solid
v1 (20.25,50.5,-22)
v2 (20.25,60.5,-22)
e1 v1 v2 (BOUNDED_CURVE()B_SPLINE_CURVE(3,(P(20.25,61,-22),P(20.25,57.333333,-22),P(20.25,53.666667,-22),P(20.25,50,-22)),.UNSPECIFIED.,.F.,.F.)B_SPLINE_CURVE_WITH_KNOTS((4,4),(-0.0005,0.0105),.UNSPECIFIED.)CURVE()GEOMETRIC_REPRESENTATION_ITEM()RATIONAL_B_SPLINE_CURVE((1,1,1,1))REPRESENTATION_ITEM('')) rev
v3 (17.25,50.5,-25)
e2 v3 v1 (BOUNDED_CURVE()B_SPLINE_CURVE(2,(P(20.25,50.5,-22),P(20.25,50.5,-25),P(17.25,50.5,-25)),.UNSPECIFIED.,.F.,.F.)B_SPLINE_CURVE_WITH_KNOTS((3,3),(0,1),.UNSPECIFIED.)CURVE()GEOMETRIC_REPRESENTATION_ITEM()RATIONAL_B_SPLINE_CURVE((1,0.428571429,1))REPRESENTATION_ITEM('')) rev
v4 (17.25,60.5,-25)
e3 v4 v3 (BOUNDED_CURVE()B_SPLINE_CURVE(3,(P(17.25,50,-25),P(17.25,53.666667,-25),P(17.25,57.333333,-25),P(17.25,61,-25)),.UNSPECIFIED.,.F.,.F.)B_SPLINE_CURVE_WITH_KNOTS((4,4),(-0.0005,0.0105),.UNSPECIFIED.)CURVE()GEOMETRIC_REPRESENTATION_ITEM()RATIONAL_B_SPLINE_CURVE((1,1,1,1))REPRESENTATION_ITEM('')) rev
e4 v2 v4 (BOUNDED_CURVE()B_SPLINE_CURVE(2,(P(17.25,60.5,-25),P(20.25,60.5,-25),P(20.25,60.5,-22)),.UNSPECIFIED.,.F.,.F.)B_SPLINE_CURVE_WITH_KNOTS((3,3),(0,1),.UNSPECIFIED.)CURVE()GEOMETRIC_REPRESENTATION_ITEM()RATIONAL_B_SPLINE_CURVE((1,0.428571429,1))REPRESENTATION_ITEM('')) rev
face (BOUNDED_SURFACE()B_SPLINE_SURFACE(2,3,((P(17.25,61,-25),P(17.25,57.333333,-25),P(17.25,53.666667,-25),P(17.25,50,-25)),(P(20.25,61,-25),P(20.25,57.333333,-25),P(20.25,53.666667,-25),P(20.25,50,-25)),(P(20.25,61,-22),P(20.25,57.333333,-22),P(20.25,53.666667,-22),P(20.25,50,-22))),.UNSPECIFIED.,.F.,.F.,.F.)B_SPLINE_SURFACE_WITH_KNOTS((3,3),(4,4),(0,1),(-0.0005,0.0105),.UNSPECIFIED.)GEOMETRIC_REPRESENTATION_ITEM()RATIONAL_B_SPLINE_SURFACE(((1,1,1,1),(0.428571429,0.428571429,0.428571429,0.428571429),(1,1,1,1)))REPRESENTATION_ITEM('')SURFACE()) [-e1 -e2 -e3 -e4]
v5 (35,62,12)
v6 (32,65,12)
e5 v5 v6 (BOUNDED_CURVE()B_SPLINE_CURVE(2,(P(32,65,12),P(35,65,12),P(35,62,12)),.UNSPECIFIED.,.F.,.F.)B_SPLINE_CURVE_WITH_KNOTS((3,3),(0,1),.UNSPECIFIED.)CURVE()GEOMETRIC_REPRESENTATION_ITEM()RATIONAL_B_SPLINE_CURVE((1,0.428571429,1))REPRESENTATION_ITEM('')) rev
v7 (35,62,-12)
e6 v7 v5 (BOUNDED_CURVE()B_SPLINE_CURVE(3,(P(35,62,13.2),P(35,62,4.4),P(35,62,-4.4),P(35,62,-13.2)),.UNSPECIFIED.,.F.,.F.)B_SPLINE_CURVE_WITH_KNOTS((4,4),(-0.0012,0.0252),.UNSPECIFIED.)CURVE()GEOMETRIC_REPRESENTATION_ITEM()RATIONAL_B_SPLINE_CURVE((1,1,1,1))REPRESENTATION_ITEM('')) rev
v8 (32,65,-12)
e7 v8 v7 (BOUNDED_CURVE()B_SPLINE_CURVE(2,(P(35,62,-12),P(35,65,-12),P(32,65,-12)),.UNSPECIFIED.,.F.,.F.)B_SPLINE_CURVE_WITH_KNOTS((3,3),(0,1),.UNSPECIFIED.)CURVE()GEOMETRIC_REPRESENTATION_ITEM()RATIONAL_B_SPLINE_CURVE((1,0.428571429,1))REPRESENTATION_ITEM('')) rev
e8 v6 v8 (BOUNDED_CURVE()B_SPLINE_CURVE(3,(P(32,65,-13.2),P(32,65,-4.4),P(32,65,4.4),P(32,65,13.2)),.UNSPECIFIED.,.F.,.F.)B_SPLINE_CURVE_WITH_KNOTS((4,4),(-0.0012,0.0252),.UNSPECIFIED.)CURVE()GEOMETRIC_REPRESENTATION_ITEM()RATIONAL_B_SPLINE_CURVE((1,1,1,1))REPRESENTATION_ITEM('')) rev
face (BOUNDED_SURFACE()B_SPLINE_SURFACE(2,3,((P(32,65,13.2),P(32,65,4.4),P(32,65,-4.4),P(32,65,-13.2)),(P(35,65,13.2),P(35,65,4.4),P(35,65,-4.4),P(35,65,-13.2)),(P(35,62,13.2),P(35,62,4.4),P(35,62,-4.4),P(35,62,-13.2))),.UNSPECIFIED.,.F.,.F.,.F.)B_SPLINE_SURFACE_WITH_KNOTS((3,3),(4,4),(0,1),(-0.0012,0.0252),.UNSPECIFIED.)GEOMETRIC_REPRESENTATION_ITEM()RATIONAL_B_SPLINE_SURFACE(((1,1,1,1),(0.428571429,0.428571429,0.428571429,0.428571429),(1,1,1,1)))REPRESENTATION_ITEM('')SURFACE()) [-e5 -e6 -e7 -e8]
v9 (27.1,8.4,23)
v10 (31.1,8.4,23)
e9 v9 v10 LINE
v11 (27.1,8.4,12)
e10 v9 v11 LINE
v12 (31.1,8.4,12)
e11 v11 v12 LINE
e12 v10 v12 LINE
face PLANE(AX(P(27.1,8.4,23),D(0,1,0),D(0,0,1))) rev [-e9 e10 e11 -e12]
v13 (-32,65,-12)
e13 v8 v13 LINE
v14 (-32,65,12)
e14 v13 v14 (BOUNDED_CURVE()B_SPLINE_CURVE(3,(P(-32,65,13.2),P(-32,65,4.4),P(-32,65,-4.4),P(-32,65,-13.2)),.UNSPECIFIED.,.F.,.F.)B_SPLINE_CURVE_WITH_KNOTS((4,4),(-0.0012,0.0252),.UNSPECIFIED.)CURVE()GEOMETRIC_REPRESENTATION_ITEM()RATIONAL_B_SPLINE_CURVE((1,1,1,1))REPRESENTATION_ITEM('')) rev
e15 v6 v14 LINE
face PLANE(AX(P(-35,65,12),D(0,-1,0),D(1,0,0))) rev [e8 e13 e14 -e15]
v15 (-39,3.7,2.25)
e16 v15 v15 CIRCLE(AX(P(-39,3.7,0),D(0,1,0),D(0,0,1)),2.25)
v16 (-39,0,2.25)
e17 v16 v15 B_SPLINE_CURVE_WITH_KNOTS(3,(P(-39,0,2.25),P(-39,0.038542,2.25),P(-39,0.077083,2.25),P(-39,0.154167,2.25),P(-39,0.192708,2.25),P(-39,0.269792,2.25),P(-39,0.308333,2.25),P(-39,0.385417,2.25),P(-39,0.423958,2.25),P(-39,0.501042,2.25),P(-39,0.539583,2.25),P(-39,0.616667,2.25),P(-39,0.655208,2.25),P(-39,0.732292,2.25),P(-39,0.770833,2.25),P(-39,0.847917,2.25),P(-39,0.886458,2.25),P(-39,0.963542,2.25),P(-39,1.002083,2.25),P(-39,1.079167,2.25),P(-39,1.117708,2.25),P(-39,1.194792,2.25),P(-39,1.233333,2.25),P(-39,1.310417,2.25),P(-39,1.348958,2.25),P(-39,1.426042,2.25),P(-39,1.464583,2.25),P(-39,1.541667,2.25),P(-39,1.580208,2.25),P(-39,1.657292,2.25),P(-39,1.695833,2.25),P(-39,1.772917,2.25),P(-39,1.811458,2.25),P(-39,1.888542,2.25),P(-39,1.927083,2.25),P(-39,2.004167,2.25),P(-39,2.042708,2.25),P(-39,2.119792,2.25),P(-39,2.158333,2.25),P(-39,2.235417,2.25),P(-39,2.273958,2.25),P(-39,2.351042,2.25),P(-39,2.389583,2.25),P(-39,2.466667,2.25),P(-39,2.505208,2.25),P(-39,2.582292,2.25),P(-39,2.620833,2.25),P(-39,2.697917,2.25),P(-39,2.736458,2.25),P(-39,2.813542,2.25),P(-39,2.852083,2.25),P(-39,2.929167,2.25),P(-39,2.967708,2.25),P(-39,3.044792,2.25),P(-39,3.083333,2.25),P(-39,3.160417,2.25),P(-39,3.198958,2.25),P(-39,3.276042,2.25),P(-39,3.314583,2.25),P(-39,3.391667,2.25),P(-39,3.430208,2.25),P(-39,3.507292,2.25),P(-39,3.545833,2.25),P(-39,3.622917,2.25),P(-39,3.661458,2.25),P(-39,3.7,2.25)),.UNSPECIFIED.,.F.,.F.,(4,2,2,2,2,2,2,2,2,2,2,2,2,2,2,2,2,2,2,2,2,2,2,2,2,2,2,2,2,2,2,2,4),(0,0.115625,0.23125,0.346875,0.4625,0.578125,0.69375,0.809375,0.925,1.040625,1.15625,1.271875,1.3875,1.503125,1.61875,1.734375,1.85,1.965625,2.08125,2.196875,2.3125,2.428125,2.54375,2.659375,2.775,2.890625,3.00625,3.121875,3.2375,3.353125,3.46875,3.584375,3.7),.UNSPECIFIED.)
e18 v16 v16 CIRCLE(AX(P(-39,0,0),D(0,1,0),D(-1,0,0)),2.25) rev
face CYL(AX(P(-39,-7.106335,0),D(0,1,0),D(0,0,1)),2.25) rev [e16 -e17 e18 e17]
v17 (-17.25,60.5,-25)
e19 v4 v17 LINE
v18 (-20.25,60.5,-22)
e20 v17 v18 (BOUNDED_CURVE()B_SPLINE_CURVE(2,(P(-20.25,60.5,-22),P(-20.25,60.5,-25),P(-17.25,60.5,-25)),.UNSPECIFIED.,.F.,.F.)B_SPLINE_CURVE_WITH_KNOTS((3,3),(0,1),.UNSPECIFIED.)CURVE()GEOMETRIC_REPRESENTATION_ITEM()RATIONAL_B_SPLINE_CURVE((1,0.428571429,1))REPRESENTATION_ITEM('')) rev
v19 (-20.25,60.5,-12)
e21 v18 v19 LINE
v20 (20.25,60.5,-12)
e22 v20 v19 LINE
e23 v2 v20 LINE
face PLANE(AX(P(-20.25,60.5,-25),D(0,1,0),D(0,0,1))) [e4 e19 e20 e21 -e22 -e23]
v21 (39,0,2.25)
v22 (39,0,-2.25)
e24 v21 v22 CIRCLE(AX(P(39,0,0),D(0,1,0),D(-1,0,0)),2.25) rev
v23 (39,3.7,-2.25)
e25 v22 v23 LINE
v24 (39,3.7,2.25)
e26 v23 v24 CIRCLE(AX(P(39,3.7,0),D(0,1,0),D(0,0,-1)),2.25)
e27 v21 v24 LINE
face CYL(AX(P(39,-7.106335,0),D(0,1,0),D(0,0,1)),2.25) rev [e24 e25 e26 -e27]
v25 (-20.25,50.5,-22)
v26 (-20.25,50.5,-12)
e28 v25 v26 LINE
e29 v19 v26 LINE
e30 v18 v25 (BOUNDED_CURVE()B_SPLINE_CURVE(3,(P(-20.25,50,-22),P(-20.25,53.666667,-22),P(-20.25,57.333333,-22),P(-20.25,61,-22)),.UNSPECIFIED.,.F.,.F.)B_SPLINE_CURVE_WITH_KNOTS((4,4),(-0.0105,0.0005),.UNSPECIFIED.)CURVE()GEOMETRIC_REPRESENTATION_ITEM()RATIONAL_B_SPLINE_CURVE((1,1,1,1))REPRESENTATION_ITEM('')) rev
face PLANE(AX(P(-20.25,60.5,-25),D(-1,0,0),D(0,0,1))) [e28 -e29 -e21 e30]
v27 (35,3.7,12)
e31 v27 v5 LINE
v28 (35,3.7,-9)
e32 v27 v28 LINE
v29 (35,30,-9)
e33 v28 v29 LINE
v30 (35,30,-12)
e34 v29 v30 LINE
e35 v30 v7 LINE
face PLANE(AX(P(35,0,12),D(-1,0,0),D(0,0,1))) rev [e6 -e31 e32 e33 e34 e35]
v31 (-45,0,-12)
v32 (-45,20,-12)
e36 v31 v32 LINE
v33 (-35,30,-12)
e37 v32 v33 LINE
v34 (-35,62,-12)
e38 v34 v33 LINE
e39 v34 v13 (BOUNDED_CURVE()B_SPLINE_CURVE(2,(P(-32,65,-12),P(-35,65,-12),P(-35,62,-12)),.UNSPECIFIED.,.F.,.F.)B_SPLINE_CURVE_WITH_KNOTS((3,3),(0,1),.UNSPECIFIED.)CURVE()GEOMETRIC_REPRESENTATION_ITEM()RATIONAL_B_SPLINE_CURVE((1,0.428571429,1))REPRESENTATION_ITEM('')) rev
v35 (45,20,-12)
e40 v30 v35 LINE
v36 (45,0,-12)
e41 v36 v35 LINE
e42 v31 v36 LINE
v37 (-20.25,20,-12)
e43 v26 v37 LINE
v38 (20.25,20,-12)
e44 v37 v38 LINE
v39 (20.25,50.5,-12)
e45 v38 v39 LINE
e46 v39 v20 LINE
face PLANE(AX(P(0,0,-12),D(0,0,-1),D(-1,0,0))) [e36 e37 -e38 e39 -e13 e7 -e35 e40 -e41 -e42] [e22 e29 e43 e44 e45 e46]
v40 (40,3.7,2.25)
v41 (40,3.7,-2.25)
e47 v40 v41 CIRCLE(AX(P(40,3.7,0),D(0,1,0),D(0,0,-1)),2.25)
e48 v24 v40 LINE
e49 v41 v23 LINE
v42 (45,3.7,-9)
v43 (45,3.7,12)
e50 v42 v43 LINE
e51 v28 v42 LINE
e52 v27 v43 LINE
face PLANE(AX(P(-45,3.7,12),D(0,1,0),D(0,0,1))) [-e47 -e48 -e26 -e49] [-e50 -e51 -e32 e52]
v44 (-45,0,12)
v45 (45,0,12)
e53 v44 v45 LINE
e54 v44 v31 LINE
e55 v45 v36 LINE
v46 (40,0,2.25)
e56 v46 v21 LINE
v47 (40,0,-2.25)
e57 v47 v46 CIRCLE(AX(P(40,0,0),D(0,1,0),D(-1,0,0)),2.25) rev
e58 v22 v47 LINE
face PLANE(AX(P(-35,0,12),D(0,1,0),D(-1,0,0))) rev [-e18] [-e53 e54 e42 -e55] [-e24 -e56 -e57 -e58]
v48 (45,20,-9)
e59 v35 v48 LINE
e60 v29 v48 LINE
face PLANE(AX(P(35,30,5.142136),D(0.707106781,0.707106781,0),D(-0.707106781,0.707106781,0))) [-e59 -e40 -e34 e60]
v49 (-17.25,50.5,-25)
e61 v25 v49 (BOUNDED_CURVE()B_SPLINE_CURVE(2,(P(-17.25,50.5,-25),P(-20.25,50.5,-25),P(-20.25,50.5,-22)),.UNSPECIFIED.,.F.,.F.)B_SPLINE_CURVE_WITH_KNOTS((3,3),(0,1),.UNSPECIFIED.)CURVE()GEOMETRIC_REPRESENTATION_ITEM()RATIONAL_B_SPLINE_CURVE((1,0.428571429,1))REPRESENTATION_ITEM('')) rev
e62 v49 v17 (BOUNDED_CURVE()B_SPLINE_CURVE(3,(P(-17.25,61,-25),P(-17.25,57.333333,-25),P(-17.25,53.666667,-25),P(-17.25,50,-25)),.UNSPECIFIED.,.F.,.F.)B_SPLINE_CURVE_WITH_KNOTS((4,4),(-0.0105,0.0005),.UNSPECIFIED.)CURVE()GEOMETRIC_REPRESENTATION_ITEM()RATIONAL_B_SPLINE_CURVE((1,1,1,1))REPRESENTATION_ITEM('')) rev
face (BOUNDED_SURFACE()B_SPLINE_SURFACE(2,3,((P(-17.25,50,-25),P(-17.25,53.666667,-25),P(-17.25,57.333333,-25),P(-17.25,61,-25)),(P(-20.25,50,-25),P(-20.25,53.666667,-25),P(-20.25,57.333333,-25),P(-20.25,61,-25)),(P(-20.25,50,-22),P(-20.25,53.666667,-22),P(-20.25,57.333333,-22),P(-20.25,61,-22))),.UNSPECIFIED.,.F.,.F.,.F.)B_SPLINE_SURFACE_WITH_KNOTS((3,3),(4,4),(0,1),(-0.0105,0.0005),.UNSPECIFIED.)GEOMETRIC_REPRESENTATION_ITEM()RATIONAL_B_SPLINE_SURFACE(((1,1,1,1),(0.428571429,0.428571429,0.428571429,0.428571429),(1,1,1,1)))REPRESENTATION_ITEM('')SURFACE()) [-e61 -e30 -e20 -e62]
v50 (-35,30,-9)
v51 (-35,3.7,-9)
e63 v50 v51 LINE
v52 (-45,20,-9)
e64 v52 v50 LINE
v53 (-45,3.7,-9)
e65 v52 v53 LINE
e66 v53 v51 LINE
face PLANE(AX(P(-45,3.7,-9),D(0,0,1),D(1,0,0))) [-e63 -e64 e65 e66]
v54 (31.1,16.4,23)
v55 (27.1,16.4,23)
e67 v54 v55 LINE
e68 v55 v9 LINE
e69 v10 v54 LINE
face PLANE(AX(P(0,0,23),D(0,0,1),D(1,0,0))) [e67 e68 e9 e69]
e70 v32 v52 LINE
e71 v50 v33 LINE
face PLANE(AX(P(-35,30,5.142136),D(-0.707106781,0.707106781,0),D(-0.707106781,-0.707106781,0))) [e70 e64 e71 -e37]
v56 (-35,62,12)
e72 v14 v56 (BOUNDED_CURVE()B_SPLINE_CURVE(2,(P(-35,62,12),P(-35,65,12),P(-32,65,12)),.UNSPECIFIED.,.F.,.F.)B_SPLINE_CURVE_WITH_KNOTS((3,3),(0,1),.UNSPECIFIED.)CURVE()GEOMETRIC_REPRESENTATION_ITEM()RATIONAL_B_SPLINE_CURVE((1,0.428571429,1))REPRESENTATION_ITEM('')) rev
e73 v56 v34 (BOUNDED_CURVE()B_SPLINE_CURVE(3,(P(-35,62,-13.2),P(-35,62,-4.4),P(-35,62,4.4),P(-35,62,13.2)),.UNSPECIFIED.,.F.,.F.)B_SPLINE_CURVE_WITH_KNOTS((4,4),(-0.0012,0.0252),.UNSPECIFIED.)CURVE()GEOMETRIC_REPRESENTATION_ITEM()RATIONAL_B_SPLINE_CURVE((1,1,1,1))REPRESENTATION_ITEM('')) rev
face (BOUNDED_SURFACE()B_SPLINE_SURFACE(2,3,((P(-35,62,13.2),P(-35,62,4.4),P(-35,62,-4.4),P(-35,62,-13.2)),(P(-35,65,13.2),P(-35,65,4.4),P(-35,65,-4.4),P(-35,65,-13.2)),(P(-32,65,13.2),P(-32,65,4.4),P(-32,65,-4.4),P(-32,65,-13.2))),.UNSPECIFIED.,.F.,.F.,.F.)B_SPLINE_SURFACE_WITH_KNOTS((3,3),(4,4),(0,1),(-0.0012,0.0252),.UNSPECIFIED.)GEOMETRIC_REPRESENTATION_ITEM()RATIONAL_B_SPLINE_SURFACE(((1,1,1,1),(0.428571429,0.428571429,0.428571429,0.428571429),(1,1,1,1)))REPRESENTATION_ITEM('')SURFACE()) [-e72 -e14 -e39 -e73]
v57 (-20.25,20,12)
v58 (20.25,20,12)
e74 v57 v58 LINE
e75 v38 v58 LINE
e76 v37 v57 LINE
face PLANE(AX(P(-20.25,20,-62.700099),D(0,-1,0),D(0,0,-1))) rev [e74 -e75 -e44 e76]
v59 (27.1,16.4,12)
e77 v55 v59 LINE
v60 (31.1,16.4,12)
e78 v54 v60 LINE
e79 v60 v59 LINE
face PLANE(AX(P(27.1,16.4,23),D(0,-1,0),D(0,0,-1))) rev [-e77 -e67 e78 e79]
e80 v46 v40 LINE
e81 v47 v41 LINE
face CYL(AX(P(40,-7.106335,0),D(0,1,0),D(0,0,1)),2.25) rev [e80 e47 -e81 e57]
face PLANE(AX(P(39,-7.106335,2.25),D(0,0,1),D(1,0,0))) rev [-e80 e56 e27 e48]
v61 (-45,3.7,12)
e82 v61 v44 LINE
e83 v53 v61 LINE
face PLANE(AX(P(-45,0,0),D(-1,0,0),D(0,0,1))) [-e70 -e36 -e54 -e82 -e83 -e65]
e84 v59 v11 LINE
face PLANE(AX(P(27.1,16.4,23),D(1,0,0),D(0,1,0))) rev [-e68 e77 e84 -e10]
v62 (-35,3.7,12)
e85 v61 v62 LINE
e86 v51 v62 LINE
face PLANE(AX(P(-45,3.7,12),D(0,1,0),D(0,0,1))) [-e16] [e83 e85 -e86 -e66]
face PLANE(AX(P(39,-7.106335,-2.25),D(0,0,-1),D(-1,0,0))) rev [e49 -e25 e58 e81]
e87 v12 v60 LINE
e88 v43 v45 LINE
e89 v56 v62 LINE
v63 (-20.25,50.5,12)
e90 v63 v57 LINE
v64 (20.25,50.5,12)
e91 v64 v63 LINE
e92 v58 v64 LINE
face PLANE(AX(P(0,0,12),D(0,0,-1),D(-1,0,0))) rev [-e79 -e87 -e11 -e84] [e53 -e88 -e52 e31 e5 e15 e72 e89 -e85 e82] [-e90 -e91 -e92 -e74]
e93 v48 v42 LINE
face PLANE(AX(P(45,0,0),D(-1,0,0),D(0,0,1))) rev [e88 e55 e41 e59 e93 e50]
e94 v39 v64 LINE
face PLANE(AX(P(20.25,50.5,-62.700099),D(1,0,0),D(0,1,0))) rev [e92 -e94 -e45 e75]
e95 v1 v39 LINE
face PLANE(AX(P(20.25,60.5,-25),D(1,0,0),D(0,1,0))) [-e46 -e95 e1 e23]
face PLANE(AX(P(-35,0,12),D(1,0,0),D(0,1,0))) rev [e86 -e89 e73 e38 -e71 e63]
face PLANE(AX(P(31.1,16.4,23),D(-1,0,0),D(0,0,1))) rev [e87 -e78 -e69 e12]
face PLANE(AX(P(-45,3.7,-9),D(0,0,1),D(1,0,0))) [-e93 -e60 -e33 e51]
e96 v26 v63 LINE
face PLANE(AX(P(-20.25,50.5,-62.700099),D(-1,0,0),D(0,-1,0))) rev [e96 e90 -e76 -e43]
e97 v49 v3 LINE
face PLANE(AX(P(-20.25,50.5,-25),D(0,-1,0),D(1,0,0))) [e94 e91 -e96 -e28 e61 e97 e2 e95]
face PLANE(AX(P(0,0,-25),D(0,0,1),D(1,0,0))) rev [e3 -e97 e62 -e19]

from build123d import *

# Parameters (mm, degrees)
SKETCH1_W           = 70
SKETCH1_H           = 65
BOSS_EXTRUDE1_DEPTH = 12
BOSS_EXTRUDE2_START = 10
BOSS_EXTRUDE2_DEPTH = 90
BOSS_EXTRUDE3_DEPTH = 3
SKETCH4_W           = 40.5
SKETCH4_H           = 10
BOSS_EXTRUDE4_DEPTH = 13
SKETCH5_W           = 40.5
SKETCH5_H           = 30.5
CUT_EXTRUDE1_DEPTH  = 24
SKETCH6_W           = 4
SKETCH6_H           = 8
BOSS_EXTRUDE5_DEPTH = 11
FILLET1_SIZE        = 3
SKETCH7_R           = 2.25
CUT_EXTRUDE2_DEPTH  = 3.7


with BuildPart() as part:
    # Sketch1 → Boss-Extrude1 (new, symmetric)
    with BuildSketch(Plane.XY):
        with Locations((0, 32.5)):
            Rectangle(SKETCH1_W, SKETCH1_H)
    extrude(amount=BOSS_EXTRUDE1_DEPTH, both=True)

    # Sketch2 → Boss-Extrude2 (add)
    with BuildSketch(Plane(origin=(35, 0, 0), x_dir=(0, 0, -1), z_dir=(1, 0, 0)).offset(BOSS_EXTRUDE2_START)):
        Polygon((12, 20), (12, 0), (-12, 0), (-12, 3.7), (9, 3.7), (9, 20), align=None)
    extrude(amount=-BOSS_EXTRUDE2_DEPTH)

    # Sketch3 → Boss-Extrude3 (add)
    with BuildSketch(Plane(origin=(0, 0, -12), x_dir=(-1, 0, 0), z_dir=(0, 0, -1))):
        Polygon((-45, 20), (-35, 20), (-35, 30), align=None)
        Polygon((35, 30), (45, 20), (35, 20), align=None)
    extrude(amount=-BOSS_EXTRUDE3_DEPTH)

    # Sketch4 → Boss-Extrude4 (add)
    with BuildSketch(Plane.XY.offset(-12)):
        with Locations((0, 55.5)):
            Rectangle(SKETCH4_W, SKETCH4_H)
    extrude(amount=-BOSS_EXTRUDE4_DEPTH)

    # Sketch5 → Cut-Extrude1 (cut)
    with BuildSketch(Plane.XY.offset(12)):
        with Locations((0, 35.25)):
            Rectangle(SKETCH5_W, SKETCH5_H)
    extrude(amount=-CUT_EXTRUDE1_DEPTH, mode=Mode.SUBTRACT)

    # Sketch6 → Boss-Extrude5 (add)
    with BuildSketch(Plane.XY.offset(12)):
        with Locations((29.1, 12.4)):
            Rectangle(SKETCH6_W, SKETCH6_H)
    extrude(amount=BOSS_EXTRUDE5_DEPTH)

    # Fillet1
    # a fillet whose section is not a circle: 3 mm, written as the material it takes off along each edge
    with BuildSketch(Plane(origin=(-35, 65, 19.5), x_dir=(0, -1, 0), z_dir=(0, 0, -1)), Plane(origin=(35, 65, -19.5), x_dir=(0, -1, 0), z_dir=(0, 0, 1))) as fillet1_piece_1:
        with BuildLine():
            Bezier((FILLET1_SIZE, 0), (0, 0), (0, -FILLET1_SIZE), weights=[1, 0.428571429, 1])
            Line((0, -FILLET1_SIZE), (0, 0))
            Line((0, 0), (FILLET1_SIZE, 0))
        make_face()
    extrude(amount=39, mode=Mode.SUBTRACT)
    with BuildSketch(Plane(origin=(-20.25, 43, -25), x_dir=(0, 0, 1), z_dir=(0, 1, 0)), Plane(origin=(20.25, 68, -25), x_dir=(0, 0, 1), z_dir=(0, -1, 0))) as fillet1_piece_2:
        with BuildLine():
            Bezier((FILLET1_SIZE, 0), (0, 0), (0, FILLET1_SIZE), weights=[1, 0.428571429, 1])
            Line((0, FILLET1_SIZE), (0, 0))
            Line((0, 0), (FILLET1_SIZE, 0))
        make_face()
    extrude(amount=25, mode=Mode.SUBTRACT)

    # Sketch7 → Cut-Extrude2 (cut)
    with BuildSketch(Plane(origin=(0, 3.7, 0), x_dir=(1, 0, 0), z_dir=(0, 1, 0))):
        with Locations(Location((-39, 0, 0), (0, 0, 270))):
            Circle(SKETCH7_R)
        with BuildLine():
            Line((39, 2.25), (40, 2.25))
            ThreePointArc((40, 2.25), (42.25, 0), (40, -2.25))
            Line((40, -2.25), (39, -2.25))
            ThreePointArc((39, -2.25), (36.75, 0), (39, 2.25))
        make_face()
    extrude(amount=-CUT_EXTRUDE2_DEPTH, mode=Mode.SUBTRACT)


solid = part.part
